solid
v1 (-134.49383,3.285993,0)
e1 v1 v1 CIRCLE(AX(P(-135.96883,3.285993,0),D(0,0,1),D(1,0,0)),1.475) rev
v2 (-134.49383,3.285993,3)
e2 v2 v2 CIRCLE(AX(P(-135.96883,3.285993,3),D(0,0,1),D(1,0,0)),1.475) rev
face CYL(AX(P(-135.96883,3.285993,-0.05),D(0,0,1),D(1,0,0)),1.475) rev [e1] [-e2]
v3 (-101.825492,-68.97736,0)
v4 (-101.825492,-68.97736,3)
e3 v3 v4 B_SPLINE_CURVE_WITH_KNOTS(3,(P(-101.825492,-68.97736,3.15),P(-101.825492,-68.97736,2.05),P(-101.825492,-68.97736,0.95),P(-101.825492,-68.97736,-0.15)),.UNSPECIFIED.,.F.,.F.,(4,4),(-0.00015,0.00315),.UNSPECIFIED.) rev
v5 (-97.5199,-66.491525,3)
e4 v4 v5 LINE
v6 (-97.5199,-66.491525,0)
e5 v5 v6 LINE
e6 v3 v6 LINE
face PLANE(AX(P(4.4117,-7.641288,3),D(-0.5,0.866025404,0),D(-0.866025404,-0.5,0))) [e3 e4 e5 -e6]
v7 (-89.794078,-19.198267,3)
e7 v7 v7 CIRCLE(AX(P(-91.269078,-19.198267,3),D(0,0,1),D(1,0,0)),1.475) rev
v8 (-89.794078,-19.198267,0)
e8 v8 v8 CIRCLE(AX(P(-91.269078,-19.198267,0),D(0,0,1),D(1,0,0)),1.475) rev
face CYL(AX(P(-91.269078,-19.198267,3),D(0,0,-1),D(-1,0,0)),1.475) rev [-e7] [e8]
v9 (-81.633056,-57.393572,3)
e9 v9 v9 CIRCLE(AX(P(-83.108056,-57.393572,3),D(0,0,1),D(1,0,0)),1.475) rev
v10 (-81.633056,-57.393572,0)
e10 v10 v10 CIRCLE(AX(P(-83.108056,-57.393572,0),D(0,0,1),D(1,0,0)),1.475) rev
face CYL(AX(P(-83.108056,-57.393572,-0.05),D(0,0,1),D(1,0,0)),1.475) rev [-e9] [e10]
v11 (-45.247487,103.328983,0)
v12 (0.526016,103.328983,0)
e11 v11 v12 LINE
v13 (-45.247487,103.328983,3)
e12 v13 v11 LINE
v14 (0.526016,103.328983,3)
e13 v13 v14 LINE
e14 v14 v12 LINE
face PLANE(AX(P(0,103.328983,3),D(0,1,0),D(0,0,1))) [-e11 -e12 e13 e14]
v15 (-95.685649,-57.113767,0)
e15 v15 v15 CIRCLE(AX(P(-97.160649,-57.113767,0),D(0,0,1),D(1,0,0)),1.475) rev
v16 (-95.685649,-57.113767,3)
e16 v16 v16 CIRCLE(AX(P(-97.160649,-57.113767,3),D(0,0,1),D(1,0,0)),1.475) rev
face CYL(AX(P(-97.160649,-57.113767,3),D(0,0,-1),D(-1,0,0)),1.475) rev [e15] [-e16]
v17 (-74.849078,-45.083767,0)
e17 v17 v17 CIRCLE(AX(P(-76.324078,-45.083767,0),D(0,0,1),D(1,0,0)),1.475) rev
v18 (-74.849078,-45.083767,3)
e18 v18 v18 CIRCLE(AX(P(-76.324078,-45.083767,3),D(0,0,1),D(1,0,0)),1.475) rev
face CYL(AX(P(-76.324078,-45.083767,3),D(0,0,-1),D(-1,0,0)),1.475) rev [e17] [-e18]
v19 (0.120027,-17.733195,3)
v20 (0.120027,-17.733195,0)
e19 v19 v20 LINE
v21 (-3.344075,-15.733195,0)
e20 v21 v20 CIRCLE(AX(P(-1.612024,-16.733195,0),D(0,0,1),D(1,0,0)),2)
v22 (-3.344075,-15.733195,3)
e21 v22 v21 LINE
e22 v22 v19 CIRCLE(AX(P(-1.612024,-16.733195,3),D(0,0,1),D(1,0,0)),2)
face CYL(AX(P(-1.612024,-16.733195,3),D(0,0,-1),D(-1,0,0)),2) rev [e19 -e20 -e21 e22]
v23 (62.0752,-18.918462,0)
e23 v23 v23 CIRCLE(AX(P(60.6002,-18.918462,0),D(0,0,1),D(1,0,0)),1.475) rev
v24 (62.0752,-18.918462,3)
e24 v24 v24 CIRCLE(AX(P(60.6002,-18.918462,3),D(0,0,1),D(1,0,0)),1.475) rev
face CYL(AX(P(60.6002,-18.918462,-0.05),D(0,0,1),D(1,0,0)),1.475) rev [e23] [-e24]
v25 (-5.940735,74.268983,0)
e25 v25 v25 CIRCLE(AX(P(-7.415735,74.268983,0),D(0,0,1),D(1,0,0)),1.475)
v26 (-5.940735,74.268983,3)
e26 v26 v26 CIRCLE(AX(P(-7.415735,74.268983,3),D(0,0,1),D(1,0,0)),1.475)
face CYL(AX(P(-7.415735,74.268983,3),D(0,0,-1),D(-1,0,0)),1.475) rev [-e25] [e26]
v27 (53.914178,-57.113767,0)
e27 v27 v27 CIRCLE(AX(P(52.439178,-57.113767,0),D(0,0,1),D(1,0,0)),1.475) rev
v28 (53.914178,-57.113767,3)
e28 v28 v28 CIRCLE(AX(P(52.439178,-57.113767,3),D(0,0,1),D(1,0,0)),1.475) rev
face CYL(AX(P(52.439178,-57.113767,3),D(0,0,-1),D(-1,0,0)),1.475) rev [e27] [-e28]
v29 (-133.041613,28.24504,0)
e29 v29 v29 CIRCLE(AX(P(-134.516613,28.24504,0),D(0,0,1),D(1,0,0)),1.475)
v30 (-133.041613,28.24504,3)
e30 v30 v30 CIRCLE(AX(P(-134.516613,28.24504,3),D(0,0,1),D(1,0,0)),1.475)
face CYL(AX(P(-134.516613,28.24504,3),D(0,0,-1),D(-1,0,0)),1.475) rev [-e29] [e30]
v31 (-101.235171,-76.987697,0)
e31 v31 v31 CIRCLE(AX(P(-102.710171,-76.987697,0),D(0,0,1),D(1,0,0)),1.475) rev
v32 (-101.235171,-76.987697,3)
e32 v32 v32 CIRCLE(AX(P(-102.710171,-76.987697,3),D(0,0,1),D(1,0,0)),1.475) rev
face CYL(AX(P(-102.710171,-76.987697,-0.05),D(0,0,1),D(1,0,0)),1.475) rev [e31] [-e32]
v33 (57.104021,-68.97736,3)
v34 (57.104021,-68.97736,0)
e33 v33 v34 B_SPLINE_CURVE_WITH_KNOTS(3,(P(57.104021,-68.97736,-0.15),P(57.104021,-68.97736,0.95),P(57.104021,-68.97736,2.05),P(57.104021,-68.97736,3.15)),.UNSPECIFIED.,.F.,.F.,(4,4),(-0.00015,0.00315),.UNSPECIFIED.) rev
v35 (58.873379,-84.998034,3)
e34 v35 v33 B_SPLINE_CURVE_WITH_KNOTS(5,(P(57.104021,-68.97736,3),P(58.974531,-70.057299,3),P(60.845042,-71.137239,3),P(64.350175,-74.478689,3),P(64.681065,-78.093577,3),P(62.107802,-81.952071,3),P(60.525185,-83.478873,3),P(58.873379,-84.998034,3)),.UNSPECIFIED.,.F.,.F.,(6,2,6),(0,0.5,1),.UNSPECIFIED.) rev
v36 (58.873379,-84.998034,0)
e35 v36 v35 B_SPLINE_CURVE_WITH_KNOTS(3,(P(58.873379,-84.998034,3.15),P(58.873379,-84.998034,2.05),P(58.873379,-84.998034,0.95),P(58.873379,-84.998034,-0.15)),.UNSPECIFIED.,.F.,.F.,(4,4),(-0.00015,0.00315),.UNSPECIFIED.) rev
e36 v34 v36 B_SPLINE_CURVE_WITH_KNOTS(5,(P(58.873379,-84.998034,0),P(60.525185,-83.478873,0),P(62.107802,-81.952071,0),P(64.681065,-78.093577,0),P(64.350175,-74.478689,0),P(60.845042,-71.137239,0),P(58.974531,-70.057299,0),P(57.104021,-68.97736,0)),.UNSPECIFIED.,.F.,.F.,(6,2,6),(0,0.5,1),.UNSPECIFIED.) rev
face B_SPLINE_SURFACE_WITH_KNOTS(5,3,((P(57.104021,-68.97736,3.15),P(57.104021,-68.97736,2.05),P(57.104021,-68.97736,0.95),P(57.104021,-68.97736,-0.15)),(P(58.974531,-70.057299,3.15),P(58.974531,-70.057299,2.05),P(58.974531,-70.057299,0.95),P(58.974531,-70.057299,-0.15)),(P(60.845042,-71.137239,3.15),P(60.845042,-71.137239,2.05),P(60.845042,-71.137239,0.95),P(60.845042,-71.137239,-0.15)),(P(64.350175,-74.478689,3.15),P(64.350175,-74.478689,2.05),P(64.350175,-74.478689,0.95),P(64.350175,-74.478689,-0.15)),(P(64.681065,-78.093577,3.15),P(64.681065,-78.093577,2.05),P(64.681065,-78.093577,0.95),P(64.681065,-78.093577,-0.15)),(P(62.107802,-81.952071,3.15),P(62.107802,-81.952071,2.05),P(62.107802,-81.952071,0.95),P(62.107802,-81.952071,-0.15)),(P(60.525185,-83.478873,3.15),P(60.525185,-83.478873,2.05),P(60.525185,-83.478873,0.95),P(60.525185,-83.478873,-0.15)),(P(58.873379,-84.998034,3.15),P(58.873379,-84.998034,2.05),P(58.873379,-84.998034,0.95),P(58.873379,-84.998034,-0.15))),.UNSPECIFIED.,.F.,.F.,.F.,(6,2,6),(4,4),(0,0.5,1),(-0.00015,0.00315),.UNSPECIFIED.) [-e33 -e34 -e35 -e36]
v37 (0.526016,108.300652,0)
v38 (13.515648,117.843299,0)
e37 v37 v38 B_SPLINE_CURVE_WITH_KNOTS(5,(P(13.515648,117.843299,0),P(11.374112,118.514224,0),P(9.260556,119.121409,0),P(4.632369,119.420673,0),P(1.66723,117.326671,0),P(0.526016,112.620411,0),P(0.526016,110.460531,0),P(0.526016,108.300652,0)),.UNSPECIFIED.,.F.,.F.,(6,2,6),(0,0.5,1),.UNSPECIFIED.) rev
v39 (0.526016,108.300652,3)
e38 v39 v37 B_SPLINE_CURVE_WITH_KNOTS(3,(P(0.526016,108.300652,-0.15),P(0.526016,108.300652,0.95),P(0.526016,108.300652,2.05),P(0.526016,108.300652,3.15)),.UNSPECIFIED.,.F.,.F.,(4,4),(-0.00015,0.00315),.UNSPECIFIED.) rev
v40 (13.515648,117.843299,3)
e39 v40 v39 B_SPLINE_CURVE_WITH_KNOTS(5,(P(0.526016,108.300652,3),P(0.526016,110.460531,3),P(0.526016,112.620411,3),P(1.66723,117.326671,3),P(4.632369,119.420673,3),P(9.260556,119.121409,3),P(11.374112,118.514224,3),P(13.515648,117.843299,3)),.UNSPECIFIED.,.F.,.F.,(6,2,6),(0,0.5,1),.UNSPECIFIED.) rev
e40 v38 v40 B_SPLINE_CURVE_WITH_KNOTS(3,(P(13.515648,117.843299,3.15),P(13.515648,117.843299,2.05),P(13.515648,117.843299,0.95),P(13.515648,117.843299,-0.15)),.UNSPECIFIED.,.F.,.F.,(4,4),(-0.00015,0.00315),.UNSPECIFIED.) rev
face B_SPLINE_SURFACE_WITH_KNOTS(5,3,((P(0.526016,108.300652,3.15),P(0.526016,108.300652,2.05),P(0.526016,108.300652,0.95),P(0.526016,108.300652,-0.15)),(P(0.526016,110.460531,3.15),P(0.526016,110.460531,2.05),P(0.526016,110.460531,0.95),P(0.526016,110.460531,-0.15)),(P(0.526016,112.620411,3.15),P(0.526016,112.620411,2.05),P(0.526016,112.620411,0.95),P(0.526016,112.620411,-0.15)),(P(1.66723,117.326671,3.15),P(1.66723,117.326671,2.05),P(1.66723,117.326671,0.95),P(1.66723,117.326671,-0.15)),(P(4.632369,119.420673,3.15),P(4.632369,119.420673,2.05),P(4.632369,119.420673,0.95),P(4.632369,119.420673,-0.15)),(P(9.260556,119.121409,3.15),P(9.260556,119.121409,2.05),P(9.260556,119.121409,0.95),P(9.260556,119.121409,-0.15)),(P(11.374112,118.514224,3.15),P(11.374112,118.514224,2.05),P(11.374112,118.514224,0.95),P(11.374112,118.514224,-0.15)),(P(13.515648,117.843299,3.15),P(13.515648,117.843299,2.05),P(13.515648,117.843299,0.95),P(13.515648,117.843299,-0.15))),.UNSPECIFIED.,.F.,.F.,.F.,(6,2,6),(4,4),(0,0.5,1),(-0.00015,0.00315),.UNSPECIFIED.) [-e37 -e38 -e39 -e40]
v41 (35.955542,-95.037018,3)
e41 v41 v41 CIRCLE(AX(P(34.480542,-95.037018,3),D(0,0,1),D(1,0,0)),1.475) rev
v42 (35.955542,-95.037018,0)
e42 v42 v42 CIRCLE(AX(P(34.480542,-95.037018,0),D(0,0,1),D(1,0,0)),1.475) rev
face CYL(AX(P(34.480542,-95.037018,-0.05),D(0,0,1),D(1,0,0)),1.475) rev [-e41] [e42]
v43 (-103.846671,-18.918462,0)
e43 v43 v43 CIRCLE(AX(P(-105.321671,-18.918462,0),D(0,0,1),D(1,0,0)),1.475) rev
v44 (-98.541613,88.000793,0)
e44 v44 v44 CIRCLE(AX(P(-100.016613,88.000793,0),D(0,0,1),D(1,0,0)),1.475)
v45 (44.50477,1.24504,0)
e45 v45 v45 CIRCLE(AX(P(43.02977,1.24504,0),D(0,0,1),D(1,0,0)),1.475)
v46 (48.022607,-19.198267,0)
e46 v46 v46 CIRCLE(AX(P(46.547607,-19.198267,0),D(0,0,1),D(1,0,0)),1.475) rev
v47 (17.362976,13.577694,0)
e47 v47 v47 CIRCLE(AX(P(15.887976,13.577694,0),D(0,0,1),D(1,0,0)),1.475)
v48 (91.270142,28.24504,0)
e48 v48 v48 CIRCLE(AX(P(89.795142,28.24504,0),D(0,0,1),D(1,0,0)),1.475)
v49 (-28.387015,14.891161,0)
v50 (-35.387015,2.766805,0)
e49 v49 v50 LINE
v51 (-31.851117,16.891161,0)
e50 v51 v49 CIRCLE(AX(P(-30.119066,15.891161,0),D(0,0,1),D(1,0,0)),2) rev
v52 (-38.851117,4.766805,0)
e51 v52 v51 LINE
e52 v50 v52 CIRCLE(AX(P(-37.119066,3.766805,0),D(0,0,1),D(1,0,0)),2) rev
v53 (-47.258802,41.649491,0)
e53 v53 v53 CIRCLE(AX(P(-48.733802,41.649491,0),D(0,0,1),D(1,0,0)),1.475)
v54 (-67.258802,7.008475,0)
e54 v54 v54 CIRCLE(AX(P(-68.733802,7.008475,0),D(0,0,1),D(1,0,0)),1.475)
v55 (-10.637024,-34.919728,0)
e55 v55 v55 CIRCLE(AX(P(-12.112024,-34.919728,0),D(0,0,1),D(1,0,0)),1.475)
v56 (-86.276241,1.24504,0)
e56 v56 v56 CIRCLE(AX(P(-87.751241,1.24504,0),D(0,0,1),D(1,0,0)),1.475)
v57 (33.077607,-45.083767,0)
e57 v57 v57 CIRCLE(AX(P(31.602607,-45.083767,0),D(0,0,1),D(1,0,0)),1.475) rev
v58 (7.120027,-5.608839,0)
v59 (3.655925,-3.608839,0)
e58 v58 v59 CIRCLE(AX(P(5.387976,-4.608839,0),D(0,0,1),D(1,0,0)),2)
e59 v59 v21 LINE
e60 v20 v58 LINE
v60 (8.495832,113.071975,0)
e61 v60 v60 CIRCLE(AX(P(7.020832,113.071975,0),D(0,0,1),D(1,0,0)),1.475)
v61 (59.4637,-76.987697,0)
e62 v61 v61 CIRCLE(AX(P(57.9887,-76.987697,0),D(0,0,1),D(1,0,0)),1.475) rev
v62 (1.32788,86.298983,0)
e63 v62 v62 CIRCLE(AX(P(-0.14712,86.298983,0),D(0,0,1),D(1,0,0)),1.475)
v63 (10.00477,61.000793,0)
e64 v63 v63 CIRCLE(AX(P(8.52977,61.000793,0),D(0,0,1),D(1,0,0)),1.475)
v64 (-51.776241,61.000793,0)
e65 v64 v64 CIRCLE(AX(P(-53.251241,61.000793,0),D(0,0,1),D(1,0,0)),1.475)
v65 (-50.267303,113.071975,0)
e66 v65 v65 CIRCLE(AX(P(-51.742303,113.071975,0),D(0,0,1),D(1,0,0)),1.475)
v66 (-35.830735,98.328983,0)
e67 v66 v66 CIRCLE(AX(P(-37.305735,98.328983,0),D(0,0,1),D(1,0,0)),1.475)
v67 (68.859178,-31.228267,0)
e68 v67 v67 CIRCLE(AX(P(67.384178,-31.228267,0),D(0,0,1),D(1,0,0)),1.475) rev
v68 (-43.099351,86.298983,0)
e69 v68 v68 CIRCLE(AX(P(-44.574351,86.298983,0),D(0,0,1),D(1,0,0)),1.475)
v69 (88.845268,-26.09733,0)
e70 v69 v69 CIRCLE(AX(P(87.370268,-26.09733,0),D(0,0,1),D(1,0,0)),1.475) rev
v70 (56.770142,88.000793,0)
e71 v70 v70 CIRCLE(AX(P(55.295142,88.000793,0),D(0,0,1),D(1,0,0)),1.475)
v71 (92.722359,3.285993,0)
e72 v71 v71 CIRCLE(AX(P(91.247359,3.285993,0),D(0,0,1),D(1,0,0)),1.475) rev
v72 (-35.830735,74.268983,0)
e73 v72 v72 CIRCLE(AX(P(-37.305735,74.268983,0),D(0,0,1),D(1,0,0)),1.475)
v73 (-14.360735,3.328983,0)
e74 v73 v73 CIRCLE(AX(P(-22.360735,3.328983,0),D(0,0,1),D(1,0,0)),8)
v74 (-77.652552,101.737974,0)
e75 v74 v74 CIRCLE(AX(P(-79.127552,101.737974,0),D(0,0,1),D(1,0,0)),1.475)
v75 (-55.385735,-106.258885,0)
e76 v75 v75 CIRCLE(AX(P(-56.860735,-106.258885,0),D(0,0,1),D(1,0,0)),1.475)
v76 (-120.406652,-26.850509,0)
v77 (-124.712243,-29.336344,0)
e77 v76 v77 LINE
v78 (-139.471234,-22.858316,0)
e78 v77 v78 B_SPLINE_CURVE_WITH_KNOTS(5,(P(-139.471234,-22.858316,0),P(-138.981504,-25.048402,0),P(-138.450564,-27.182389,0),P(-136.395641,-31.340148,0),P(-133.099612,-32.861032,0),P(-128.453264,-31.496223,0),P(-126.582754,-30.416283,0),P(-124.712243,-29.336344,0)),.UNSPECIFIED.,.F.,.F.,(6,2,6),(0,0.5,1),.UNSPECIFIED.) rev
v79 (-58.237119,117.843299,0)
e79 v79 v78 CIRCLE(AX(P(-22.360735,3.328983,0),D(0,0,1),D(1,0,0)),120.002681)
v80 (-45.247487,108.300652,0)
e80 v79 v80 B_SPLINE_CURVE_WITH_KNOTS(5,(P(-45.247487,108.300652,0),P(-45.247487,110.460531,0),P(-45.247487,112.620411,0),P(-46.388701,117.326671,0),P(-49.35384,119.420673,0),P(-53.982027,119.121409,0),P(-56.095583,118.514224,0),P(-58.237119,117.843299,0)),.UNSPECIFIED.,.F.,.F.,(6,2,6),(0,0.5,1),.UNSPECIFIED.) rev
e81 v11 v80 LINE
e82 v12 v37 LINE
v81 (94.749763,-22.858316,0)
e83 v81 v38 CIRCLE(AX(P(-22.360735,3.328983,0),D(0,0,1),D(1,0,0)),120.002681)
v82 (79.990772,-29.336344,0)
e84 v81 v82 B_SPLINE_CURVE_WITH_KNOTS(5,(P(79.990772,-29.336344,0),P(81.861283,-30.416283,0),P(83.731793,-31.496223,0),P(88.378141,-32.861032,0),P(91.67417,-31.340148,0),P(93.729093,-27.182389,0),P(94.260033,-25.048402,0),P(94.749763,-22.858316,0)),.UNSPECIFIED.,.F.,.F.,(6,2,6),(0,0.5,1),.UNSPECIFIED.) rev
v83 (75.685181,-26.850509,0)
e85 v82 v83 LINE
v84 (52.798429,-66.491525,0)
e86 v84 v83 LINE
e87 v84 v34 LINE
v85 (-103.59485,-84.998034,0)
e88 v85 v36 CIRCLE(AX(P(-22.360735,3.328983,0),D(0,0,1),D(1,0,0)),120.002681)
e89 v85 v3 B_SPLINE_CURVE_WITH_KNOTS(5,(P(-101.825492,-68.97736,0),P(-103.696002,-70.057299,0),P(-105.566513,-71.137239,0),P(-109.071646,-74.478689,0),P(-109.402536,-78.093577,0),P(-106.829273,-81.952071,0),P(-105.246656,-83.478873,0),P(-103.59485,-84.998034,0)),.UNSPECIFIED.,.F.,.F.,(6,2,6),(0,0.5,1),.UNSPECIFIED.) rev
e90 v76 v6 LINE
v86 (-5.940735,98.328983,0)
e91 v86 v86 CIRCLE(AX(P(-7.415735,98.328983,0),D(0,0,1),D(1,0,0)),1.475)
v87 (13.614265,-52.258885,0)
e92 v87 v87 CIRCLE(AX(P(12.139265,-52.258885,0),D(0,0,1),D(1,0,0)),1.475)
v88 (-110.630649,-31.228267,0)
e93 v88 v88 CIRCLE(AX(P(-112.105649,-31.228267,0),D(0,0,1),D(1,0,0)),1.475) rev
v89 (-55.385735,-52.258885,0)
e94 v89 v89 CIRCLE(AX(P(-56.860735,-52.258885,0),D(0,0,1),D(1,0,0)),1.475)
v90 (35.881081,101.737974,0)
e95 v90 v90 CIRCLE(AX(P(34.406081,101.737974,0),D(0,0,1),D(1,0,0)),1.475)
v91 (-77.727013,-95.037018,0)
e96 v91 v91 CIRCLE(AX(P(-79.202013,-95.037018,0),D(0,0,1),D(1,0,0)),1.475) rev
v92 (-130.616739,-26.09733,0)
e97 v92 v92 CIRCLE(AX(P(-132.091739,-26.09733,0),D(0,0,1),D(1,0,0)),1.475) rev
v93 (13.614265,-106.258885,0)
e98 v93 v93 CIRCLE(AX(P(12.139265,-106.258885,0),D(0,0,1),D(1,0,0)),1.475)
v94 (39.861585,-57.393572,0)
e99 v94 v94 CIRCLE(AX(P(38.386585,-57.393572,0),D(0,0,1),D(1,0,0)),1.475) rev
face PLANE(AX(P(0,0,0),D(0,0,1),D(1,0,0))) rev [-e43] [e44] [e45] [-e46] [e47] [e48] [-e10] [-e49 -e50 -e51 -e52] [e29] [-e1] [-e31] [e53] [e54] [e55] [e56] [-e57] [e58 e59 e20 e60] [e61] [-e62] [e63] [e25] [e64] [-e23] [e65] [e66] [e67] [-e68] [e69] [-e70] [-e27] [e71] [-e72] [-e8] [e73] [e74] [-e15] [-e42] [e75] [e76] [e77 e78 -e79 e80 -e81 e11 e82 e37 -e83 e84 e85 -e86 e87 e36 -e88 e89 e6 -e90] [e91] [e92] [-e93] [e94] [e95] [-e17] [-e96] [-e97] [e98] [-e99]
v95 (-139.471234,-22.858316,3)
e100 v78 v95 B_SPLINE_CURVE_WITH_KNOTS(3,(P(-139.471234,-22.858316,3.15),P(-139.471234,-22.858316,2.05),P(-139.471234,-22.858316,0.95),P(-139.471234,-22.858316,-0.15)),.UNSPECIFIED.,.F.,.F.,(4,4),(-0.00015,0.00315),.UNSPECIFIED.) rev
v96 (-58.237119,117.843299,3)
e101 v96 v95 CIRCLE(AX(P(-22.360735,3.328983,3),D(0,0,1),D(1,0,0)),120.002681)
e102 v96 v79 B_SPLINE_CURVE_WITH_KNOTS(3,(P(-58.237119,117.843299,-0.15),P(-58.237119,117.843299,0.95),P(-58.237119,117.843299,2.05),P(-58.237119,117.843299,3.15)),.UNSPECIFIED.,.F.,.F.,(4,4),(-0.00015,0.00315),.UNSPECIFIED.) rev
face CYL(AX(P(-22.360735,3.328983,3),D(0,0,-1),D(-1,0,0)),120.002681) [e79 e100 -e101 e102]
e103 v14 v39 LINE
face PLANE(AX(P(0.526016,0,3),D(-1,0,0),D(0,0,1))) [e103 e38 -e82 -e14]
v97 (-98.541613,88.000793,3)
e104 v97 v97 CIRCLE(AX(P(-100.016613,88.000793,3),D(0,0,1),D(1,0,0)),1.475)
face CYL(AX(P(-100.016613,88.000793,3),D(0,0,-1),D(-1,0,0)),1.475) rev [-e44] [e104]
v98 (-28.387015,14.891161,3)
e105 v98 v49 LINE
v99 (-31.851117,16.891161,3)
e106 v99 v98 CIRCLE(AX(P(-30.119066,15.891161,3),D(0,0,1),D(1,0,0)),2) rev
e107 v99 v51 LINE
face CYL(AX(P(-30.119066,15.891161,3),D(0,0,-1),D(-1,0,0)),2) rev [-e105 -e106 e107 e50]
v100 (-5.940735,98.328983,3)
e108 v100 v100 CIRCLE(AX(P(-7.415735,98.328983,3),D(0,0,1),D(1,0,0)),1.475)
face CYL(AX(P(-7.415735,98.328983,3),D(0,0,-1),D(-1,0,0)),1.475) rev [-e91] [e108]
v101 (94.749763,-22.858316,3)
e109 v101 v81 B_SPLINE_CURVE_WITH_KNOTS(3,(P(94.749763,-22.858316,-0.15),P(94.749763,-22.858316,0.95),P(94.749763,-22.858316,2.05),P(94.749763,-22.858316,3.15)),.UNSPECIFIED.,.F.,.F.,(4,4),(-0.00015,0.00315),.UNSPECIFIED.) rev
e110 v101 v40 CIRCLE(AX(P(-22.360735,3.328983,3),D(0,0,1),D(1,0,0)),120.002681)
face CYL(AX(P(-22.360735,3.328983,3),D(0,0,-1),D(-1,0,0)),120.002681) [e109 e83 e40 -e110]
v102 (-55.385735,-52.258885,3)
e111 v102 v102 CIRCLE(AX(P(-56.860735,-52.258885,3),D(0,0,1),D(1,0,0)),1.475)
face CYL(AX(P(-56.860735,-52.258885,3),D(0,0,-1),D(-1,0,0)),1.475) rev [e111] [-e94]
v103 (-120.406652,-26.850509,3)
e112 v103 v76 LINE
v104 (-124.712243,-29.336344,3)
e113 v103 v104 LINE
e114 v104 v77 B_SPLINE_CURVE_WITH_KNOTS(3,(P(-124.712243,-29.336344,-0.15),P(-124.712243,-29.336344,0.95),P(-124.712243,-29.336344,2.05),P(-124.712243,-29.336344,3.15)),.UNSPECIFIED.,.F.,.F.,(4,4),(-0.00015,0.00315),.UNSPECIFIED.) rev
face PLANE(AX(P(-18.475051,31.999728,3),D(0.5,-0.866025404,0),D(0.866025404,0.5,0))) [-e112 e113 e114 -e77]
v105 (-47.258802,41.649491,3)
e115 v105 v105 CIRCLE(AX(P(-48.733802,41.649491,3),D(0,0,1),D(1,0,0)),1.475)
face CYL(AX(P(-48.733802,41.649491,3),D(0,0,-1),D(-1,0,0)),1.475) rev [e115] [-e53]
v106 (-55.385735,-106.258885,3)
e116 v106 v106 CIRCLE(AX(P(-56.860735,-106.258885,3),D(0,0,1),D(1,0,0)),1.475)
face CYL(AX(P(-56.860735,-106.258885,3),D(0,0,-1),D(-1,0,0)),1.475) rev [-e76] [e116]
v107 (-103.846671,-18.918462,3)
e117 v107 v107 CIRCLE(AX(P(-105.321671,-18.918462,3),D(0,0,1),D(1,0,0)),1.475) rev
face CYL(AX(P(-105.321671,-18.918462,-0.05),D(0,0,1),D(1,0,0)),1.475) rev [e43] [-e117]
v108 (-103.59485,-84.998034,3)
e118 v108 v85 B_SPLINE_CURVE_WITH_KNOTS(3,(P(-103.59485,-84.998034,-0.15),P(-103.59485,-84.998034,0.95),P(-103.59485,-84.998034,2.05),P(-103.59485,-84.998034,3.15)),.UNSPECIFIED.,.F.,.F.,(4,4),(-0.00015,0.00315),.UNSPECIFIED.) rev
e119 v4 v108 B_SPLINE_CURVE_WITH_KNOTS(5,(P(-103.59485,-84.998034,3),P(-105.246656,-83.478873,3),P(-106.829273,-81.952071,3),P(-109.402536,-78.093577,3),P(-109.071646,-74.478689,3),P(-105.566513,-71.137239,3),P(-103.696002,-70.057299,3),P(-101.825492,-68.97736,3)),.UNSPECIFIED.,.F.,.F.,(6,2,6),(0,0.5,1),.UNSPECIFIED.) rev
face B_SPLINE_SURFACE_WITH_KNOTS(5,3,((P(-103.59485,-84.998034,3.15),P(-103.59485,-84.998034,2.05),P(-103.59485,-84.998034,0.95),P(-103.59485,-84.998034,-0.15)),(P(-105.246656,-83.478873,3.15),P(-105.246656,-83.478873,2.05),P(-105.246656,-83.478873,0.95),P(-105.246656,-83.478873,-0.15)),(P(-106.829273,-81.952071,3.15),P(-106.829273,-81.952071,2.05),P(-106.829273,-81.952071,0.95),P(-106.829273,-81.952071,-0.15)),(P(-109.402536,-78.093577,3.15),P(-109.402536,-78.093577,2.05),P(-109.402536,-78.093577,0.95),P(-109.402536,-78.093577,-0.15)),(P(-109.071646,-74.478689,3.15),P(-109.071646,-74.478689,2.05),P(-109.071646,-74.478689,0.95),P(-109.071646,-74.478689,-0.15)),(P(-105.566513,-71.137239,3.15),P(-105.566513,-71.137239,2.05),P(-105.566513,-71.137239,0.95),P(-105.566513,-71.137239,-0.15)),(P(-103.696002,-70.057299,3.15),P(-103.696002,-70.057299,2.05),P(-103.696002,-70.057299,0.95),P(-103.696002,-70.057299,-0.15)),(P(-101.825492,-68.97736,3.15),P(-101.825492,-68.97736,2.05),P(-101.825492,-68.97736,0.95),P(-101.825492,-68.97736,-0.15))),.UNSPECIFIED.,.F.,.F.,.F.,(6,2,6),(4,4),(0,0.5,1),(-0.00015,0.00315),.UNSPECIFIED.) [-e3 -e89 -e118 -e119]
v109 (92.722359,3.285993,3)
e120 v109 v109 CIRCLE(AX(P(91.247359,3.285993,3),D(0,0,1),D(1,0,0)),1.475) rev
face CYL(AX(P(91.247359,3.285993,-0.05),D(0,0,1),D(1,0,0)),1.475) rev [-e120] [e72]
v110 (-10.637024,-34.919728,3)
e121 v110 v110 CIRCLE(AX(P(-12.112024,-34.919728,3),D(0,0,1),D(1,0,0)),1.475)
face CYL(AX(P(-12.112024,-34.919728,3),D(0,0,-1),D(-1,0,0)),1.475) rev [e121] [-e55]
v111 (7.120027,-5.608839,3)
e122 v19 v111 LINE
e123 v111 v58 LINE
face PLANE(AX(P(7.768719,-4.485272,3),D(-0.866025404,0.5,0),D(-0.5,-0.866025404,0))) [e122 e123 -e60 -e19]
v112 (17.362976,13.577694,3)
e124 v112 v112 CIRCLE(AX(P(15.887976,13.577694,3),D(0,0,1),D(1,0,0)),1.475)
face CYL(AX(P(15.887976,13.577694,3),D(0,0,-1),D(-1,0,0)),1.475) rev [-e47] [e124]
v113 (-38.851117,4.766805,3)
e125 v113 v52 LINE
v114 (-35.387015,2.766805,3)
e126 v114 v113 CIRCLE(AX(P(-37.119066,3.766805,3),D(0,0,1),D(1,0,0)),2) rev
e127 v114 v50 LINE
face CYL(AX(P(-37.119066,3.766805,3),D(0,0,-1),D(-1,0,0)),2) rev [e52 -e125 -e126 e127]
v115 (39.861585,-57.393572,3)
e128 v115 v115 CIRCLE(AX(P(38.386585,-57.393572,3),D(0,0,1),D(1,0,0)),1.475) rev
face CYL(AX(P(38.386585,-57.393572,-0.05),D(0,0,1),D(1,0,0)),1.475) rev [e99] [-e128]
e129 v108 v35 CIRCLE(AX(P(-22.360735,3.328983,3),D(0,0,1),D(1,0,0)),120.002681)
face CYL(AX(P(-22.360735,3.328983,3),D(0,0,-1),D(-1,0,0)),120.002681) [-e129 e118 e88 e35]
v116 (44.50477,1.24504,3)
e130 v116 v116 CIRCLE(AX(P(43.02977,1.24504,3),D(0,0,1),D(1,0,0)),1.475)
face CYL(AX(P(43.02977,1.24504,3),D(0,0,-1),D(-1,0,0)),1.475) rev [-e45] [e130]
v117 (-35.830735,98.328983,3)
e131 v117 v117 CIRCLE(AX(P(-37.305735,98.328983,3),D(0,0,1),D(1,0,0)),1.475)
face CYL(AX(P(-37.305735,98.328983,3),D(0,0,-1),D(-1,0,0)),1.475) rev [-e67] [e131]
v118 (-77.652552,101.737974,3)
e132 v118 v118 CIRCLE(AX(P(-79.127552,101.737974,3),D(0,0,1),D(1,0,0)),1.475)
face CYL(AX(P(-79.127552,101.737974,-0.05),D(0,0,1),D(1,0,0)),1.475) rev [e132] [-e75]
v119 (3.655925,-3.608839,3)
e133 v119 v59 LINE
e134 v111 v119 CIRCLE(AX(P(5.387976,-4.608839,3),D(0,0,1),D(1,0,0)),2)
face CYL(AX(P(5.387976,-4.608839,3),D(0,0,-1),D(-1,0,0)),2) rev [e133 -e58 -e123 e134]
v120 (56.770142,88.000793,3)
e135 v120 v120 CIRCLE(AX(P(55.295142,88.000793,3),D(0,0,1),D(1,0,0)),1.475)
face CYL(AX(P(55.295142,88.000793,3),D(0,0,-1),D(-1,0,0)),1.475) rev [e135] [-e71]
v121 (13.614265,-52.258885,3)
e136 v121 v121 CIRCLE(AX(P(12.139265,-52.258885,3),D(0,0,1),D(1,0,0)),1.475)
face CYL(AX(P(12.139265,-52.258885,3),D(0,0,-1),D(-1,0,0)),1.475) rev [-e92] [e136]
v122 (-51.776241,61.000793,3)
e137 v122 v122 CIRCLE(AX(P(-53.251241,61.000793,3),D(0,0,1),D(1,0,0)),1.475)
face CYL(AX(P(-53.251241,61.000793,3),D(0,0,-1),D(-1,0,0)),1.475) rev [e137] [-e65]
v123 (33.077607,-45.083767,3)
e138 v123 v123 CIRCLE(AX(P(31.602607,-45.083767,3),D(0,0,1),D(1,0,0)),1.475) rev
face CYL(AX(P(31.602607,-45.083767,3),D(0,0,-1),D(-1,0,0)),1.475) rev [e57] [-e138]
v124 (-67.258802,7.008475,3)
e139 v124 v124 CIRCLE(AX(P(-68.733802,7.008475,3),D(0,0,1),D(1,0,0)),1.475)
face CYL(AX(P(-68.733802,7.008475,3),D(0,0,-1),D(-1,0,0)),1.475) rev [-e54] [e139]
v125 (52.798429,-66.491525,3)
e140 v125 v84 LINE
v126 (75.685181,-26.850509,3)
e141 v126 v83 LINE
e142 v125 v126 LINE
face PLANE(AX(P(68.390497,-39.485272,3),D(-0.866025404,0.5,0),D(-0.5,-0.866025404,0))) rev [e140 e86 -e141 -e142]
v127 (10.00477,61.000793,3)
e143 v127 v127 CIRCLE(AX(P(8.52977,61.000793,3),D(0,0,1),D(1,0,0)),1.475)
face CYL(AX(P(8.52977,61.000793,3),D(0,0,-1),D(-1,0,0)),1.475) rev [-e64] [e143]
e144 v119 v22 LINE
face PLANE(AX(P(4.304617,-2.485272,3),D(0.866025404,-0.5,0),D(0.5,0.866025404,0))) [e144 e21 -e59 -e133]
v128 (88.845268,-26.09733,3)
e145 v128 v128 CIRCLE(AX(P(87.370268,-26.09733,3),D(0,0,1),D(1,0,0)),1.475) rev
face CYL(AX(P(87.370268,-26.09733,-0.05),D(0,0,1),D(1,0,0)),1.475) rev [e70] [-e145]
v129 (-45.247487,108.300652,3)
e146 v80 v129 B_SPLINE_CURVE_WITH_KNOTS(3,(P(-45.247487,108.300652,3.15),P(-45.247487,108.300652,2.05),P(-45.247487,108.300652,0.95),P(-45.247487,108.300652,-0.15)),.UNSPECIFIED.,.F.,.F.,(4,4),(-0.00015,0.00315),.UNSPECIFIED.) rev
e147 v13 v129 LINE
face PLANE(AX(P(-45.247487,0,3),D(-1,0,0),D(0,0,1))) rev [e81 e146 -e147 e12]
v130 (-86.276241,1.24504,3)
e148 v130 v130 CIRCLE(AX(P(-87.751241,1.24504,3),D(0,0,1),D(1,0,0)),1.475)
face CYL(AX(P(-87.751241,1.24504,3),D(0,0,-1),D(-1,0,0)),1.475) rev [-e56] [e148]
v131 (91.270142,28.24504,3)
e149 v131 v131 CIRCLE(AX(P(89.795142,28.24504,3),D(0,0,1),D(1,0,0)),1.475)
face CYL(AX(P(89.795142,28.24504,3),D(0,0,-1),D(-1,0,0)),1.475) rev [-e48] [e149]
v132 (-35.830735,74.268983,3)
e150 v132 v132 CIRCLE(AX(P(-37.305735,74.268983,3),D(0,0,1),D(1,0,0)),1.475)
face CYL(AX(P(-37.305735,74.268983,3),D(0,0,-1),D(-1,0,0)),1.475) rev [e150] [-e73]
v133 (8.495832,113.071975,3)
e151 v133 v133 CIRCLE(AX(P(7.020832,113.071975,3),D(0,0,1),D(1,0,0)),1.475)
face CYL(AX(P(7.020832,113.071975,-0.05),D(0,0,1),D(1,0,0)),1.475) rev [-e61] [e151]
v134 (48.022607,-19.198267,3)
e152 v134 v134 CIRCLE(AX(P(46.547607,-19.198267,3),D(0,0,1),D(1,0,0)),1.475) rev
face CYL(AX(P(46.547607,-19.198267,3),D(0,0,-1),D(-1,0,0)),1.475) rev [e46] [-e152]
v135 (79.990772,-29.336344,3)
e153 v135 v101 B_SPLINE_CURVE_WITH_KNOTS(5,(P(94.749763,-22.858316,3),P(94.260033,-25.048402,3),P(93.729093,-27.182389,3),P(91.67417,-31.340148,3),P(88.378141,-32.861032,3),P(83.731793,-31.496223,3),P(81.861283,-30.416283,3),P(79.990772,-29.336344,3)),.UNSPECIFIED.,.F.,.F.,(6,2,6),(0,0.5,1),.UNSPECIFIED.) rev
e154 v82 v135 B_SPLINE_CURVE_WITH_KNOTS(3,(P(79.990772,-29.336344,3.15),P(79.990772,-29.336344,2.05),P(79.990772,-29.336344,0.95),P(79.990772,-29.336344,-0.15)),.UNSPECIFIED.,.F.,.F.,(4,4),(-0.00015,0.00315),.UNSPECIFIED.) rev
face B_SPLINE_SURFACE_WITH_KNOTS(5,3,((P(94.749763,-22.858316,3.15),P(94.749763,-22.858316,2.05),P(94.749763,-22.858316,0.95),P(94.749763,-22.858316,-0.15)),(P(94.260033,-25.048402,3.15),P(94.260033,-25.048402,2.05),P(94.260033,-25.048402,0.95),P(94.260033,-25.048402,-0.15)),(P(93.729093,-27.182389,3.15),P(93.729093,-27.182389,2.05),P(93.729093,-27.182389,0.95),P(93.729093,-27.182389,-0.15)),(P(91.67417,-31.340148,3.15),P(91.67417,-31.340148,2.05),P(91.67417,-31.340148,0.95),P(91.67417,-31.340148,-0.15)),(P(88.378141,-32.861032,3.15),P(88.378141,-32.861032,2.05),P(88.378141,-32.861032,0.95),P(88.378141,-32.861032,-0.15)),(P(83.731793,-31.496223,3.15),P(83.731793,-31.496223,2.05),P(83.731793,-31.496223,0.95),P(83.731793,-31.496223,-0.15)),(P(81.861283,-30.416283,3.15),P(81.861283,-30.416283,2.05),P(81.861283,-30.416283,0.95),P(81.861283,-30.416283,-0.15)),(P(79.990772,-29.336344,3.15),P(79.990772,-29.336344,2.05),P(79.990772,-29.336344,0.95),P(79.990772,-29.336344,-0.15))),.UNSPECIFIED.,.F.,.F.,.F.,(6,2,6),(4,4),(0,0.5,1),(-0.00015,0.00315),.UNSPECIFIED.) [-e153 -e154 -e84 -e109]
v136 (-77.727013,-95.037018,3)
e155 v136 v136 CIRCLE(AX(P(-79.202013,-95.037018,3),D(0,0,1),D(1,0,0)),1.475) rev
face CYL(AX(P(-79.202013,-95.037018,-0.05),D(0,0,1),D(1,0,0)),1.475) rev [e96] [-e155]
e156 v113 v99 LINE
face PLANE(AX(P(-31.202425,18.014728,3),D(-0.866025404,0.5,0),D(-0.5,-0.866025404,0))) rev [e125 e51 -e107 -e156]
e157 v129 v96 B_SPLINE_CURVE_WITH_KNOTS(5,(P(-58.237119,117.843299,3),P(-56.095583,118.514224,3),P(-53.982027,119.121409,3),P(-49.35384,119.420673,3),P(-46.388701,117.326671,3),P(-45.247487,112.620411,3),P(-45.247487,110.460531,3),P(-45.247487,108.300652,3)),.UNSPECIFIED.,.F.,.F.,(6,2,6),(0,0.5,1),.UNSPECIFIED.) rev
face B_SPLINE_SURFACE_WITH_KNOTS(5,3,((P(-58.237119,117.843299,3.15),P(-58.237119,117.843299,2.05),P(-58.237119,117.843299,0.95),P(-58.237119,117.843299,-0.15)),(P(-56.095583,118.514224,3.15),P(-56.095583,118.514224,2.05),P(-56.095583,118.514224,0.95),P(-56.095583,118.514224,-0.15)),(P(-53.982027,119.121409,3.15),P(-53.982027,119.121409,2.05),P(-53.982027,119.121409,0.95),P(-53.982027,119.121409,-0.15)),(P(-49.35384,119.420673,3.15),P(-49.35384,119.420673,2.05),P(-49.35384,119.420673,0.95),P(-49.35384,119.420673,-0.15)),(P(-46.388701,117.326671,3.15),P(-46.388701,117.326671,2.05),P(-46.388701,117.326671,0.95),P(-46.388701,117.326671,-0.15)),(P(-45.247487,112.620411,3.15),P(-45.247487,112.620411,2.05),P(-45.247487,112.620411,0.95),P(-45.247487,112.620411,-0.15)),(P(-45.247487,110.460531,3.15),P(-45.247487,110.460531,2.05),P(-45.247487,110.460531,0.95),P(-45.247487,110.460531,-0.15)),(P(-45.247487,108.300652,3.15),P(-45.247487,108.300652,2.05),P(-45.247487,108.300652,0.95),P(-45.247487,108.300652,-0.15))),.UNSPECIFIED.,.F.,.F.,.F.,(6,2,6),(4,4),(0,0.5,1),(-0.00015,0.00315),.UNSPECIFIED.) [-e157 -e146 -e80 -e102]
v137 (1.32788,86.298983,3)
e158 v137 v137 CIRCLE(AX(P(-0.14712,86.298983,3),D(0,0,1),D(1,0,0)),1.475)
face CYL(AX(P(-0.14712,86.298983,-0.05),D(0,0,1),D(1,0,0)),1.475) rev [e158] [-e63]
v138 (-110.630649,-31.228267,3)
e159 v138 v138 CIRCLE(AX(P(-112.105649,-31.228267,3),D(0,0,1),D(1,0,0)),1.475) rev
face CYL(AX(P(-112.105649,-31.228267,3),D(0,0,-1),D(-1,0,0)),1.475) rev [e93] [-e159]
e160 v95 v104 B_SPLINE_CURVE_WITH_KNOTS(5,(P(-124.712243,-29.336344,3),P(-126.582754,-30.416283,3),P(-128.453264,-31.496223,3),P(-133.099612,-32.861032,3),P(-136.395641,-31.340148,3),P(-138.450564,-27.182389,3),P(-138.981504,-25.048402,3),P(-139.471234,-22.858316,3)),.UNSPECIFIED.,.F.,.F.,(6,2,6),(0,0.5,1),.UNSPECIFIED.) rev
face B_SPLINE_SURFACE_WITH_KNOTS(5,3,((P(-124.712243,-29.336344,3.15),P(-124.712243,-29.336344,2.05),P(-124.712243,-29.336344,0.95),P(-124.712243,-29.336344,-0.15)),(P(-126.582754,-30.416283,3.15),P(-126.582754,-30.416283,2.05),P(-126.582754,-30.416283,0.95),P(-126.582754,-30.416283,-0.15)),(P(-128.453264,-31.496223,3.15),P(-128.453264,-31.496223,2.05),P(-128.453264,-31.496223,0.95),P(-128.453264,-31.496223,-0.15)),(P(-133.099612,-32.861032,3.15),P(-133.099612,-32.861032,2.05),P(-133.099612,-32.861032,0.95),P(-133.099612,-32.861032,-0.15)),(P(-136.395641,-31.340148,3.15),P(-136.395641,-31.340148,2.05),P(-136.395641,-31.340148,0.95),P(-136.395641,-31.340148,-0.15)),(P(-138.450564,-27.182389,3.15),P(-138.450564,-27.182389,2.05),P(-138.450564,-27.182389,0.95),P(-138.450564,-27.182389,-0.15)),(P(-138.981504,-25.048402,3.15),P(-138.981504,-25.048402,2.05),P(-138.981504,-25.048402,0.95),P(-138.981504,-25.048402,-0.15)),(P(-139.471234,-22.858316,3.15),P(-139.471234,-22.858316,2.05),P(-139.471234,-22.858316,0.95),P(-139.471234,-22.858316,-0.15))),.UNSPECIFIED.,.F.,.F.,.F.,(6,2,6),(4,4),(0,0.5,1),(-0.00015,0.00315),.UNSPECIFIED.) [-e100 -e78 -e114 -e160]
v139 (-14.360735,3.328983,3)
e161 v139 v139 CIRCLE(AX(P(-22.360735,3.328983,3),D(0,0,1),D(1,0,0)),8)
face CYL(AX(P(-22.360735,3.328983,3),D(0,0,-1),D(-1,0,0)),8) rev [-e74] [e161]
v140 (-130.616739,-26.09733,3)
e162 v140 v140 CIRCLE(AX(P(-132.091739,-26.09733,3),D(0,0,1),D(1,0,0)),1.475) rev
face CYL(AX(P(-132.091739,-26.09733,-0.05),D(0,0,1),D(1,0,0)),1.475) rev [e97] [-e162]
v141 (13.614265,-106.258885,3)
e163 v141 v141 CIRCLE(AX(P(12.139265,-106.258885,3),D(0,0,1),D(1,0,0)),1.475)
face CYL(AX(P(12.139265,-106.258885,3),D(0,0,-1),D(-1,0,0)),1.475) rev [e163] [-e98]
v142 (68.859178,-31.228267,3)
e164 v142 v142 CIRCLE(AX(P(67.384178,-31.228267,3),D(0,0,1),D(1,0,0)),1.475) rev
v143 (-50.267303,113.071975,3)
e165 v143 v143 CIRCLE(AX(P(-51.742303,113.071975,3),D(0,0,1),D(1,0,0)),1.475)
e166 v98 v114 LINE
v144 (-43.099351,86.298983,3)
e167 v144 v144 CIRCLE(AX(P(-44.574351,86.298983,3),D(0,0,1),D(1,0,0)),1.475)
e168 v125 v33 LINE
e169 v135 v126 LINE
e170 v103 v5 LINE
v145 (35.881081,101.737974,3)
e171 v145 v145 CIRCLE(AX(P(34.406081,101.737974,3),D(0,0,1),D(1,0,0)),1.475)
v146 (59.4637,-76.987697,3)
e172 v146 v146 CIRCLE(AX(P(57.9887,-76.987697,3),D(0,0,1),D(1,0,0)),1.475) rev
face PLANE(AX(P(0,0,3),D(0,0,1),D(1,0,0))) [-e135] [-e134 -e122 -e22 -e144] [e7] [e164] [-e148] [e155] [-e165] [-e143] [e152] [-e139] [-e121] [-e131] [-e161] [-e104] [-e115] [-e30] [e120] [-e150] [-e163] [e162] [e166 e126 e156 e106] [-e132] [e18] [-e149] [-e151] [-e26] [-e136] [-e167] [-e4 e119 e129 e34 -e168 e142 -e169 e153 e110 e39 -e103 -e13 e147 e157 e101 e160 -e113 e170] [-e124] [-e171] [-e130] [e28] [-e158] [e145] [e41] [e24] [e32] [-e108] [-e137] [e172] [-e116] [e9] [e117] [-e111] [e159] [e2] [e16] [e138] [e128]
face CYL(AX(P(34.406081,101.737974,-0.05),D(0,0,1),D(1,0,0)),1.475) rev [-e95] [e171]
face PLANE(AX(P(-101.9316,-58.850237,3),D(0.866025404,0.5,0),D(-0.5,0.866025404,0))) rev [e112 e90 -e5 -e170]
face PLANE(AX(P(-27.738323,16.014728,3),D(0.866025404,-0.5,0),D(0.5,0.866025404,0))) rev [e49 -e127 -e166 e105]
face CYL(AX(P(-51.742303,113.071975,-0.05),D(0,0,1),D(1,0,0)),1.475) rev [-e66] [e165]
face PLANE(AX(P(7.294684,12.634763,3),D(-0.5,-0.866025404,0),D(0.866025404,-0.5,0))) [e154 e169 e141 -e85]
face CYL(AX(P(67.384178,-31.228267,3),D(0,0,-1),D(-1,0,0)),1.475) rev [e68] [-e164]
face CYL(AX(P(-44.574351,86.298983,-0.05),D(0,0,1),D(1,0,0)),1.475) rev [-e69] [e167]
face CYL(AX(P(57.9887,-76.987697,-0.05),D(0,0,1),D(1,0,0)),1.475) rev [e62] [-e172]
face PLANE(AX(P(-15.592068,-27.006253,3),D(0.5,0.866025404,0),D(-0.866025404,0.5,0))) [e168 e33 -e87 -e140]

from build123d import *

# Parameters (mm, degrees)
SKETCH1_R           = 1.475
SKETCH1_R_2         = 8
BOSS_EXTRUDE1_DEPTH = 3
FILLET1_START       = -1
FILLET1_DEPTH       = 5
SKETCH2_R           = 1.475
CUT_EXTRUDE1_DEPTH  = 186.540999332


with BuildPart() as part:
    # Sketch1 → Boss-Extrude1 (new body)
    with BuildSketch(Plane.XY):
        with BuildLine():
            Line((0.526015848, 103.328982943), (-45.247486844, 103.328982943))
            Line((-45.247486844, 103.328982943), (-45.247486844, 121.128982943))
            ThreePointArc((-45.247486844, 121.128982943), (-126.28610555, 63.330323318), (-135.821903737, -35.750508981))
            Line((-135.821903737, -35.750508981), (-120.406651549, -26.850508981))
            Line((-120.406651549, -26.850508981), (-97.519900204, -66.491525133))
            Line((-97.519900204, -66.491525133), (-112.935152391, -75.391525133))
            ThreePointArc((-112.935152391, -75.391525133), (-22.360735498, -116.673697807), (68.213681395, -75.391525133))
            Line((68.213681395, -75.391525133), (52.798429207, -66.491525133))
            Line((52.798429207, -66.491525133), (75.685180553, -26.850508981))
            Line((75.685180553, -26.850508981), (91.100432741, -35.750508981))
            ThreePointArc((91.100432741, -35.750508981), (81.564634554, 63.330323318), (0.526015848, 121.128982943))
            Line((0.526015848, 121.128982943), (0.526015848, 103.328982943))
        make_face()
        with Locations((67.384177861, -31.228267397)):
            Circle(SKETCH1_R, mode=Mode.SUBTRACT)
        with Locations((52.439177861, -57.113766716)):
            Circle(SKETCH1_R, mode=Mode.SUBTRACT)
        with Locations((-97.160648858, -57.113766716)):
            Circle(SKETCH1_R, mode=Mode.SUBTRACT)
        with Locations((-56.860735498, -106.258884513)):
            Circle(SKETCH1_R, mode=Mode.SUBTRACT)
        with Locations((-112.105648858, -31.228267397)):
            Circle(SKETCH1_R, mode=Mode.SUBTRACT)
        with Locations((-91.269077643, -19.198267397)):
            Circle(SKETCH1_R, mode=Mode.SUBTRACT)
        with Locations((-76.324077643, -45.083766716)):
            Circle(SKETCH1_R, mode=Mode.SUBTRACT)
        with Locations((-56.860735498, -52.258884513)):
            Circle(SKETCH1_R, mode=Mode.SUBTRACT)
        with Locations((12.139264502, -106.258884513)):
            Circle(SKETCH1_R, mode=Mode.SUBTRACT)
        with Locations((-12.112024192, -34.919728363)):
            Circle(SKETCH1_R, mode=Mode.SUBTRACT)
        with Locations((12.139264502, -52.258884513)):
            Circle(SKETCH1_R, mode=Mode.SUBTRACT)
        with Locations((31.602606646, -45.083766716)):
            Circle(SKETCH1_R, mode=Mode.SUBTRACT)
        with BuildLine():
            ThreePointArc((0.120026615, -17.733194883), (-1.094386102, -18.665046536), (-2.612024192, -18.465245691))
            ThreePointArc((-2.612024192, -18.465245691), (-3.543875845, -17.250832974), (-3.344075, -15.733194883))
            Line((-3.344075, -15.733194883), (3.655925, -3.60883923))
            ThreePointArc((3.655925, -3.60883923), (4.870337718, -2.676987578), (6.387975808, -2.876788423))
            ThreePointArc((6.387975808, -2.876788423), (7.31982746, -4.09120114), (7.120026615, -5.60883923))
            Line((7.120026615, -5.60883923), (0.120026615, -17.733194883))
        make_face(mode=Mode.SUBTRACT)
        with Locations((46.547606646, -19.198267397)):
            Circle(SKETCH1_R, mode=Mode.SUBTRACT)
        with Locations((-87.751240857, 1.245040241)):
            Circle(SKETCH1_R, mode=Mode.SUBTRACT)
        with Locations((-134.516612662, 28.245040241)):
            Circle(SKETCH1_R, mode=Mode.SUBTRACT)
        with Locations((-68.733802457, 7.008474867)):
            Circle(SKETCH1_R, mode=Mode.SUBTRACT)
        with BuildLine():
            Line((-28.38701494, 14.89116077), (-35.38701494, 2.766805117))
            ThreePointArc((-35.38701494, 2.766805117), (-38.119065747, 2.034754309), (-38.851116555, 4.766805117))
            Line((-38.851116555, 4.766805117), (-31.851116555, 16.89116077))
            ThreePointArc((-31.851116555, 16.89116077), (-29.119065747, 17.623211577), (-28.38701494, 14.89116077))
        make_face(mode=Mode.SUBTRACT)
        with Locations((-48.733802457, 41.649491019)):
            Circle(SKETCH1_R, mode=Mode.SUBTRACT)
        with Locations((-100.016612662, 88.000793102)):
            Circle(SKETCH1_R, mode=Mode.SUBTRACT)
        with Locations((-53.251240857, 61.000793102)):
            Circle(SKETCH1_R, mode=Mode.SUBTRACT)
        with Locations((-37.305735498, 74.268982943)):
            Circle(SKETCH1_R, mode=Mode.SUBTRACT)
        with Locations((-37.305735498, 98.328982943)):
            Circle(SKETCH1_R, mode=Mode.SUBTRACT)
        with Locations((-22.360735498, 3.328982943)):
            Circle(SKETCH1_R_2, mode=Mode.SUBTRACT)
        with Locations((15.887975808, 13.577694249)):
            Circle(SKETCH1_R, mode=Mode.SUBTRACT)
        with Locations((43.029769861, 1.245040241)):
            Circle(SKETCH1_R, mode=Mode.SUBTRACT)
        with Locations((89.795141666, 28.245040241)):
            Circle(SKETCH1_R, mode=Mode.SUBTRACT)
        with Locations((8.529769861, 61.000793102)):
            Circle(SKETCH1_R, mode=Mode.SUBTRACT)
        with Locations((-7.415735498, 74.268982943)):
            Circle(SKETCH1_R, mode=Mode.SUBTRACT)
        with Locations((-7.415735498, 98.328982943)):
            Circle(SKETCH1_R, mode=Mode.SUBTRACT)
        with Locations((55.295141666, 88.000793102)):
            Circle(SKETCH1_R, mode=Mode.SUBTRACT)
    extrude(amount=BOSS_EXTRUDE1_DEPTH)

    # Fillet1: read off the stored shape, not the designer's step
    # Fillet1 outline → Fillet1 (cut)
    with BuildSketch(Plane.XY.offset(FILLET1_START)):
        with BuildLine():
            ThreePointArc((-45.247486844, 121.128982943), (-51.788195876, 119.667574833), (-58.237118653, 117.843298724))
            add(Edge.make_bspline(
                [(-58.237118653, 117.843298724), (-56.095583294, 118.514223949), (-53.982026531, 119.121408989), (-49.353840332, 119.42067321), (-46.388701083, 117.326670501), (-45.247486844, 112.620410582), (-45.247486844, 110.460531419), (-45.247486844, 108.300652255)],
                knots=[0, 0, 0, 0, 0, 0, 0.5, 0.5, 1, 1, 1, 1, 1, 1], degree=5))
            Line((-45.247486844, 108.300652255), (-45.247486844, 121.128982943))
        make_face()
        with BuildLine():
            add(Edge.make_bspline(
                [(-124.712243473, -29.336343637), (-126.582753698, -30.416283219), (-128.453263923, -31.496222801), (-133.099611688, -32.861032238), (-136.395640855, -31.340147677), (-138.450563536, -27.182388745), (-138.981504249, -25.048402376), (-139.471233639, -22.858315739)],
                knots=[0, 0, 0, 0, 0, 0, 0.5, 0.5, 1, 1, 1, 1, 1, 1], degree=5))
            ThreePointArc((-139.471233639, -22.858315739), (-137.826641704, -29.355384745), (-135.821903737, -35.750508981))
            Line((-135.821903737, -35.750508981), (-124.712243473, -29.336343637))
        make_face()
        with BuildLine():
            ThreePointArc((91.100432741, -35.750508981), (93.105170708, -29.355384745), (94.749762643, -22.858315739))
            add(Edge.make_bspline(
                [(94.749762643, -22.858315739), (94.260033253, -25.048402376), (93.72909254, -27.182388745), (91.674169859, -31.340147677), (88.378140692, -32.861032238), (83.731792926, -31.496222801), (81.861282701, -30.416283219), (79.990772476, -29.336343637)],
                knots=[0, 0, 0, 0, 0, 0, 0.5, 0.5, 1, 1, 1, 1, 1, 1], degree=5))
            Line((79.990772476, -29.336343637), (91.100432741, -35.750508981))
        make_face()
        with BuildLine():
            Line((0.526015848, 121.128982943), (0.526015848, 108.300652255))
            add(Edge.make_bspline(
                [(0.526015848, 108.300652255), (0.526015848, 110.460531419), (0.526015848, 112.620410582), (1.667230086, 117.326670501), (4.632369336, 119.42067321), (9.260555535, 119.121408989), (11.374112298, 118.514223949), (13.515647657, 117.843298724)],
                knots=[0, 0, 0, 0, 0, 0, 0.5, 0.5, 1, 1, 1, 1, 1, 1], degree=5))
            ThreePointArc((13.515647657, 117.843298724), (7.06672488, 119.667574833), (0.526015848, 121.128982943))
        make_face()
        with BuildLine():
            ThreePointArc((-112.935152391, -75.391525133), (-108.399181326, -80.325241258), (-103.594850484, -84.998034156))
            add(Edge.make_bspline(
                [(-103.594850484, -84.998034156), (-105.246656452, -83.478872744), (-106.829272503, -81.952071414), (-109.402536021, -78.093576704), (-109.071646103, -74.478689433), (-105.566512577, -71.137238952), (-103.696002352, -70.05729937), (-101.825492127, -68.977359788)],
                knots=[0, 0, 0, 0, 0, 0, 0.5, 0.5, 1, 1, 1, 1, 1, 1], degree=5))
            Line((-101.825492127, -68.977359788), (-112.935152391, -75.391525133))
        make_face()
        with BuildLine():
            Line((68.213681395, -75.391525133), (57.104021131, -68.977359788))
            add(Edge.make_bspline(
                [(57.104021131, -68.977359788), (58.974531355, -70.05729937), (60.84504158, -71.137238952), (64.350175107, -74.478689433), (64.681065025, -78.093576704), (62.107801507, -81.952071414), (60.525185456, -83.478872744), (58.873379488, -84.998034156)],
                knots=[0, 0, 0, 0, 0, 0, 0.5, 0.5, 1, 1, 1, 1, 1, 1], degree=5))
            ThreePointArc((58.873379488, -84.998034156), (63.67771033, -80.325241258), (68.213681395, -75.391525133))
        make_face()
    extrude(amount=FILLET1_DEPTH, mode=Mode.SUBTRACT)

    # Sketch2 → Cut-Extrude1 (cut, through all)
    with BuildSketch(Plane.XY.offset(3)):
        with Locations((7.020831752, 113.07197549)):
            Circle(SKETCH2_R)
        with Locations((-51.742302749, 113.07197549)):
            Circle(SKETCH2_R)
        with Locations((-79.127551915, 101.737973696)):
            Circle(SKETCH2_R)
        with Locations((34.406080919, 101.737973696)):
            Circle(SKETCH2_R)
        with Locations((-0.147120048, 86.298982943)):
            Circle(SKETCH2_R)
        with Locations((-44.574350948, 86.298982943)):
            Circle(SKETCH2_R)
        with Locations((91.247358663, 3.285992676)):
            Circle(SKETCH2_R)
        with Locations((87.37026756, -26.097329688)):
            Circle(SKETCH2_R)
        with Locations((60.600199979, -18.918461767)):
            Circle(SKETCH2_R)
        with Locations((38.386584529, -57.393572347)):
            Circle(SKETCH2_R)
        with Locations((34.480542246, -95.037017543)):
            Circle(SKETCH2_R)
        with Locations((57.988700309, -76.987696972)):
            Circle(SKETCH2_R)
        with Locations((-79.202013242, -95.037017543)):
            Circle(SKETCH2_R)
        with Locations((-102.710171305, -76.987696972)):
            Circle(SKETCH2_R)
        with Locations((-83.108055525, -57.393572347)):
            Circle(SKETCH2_R)
        with Locations((-132.091738556, -26.097329688)):
            Circle(SKETCH2_R)
        with Locations((-105.321670975, -18.918461767)):
            Circle(SKETCH2_R)
        with Locations((-135.96882966, 3.285992676)):
            Circle(SKETCH2_R)
    extrude(amount=-CUT_EXTRUDE1_DEPTH, mode=Mode.SUBTRACT)


solid = part.part
